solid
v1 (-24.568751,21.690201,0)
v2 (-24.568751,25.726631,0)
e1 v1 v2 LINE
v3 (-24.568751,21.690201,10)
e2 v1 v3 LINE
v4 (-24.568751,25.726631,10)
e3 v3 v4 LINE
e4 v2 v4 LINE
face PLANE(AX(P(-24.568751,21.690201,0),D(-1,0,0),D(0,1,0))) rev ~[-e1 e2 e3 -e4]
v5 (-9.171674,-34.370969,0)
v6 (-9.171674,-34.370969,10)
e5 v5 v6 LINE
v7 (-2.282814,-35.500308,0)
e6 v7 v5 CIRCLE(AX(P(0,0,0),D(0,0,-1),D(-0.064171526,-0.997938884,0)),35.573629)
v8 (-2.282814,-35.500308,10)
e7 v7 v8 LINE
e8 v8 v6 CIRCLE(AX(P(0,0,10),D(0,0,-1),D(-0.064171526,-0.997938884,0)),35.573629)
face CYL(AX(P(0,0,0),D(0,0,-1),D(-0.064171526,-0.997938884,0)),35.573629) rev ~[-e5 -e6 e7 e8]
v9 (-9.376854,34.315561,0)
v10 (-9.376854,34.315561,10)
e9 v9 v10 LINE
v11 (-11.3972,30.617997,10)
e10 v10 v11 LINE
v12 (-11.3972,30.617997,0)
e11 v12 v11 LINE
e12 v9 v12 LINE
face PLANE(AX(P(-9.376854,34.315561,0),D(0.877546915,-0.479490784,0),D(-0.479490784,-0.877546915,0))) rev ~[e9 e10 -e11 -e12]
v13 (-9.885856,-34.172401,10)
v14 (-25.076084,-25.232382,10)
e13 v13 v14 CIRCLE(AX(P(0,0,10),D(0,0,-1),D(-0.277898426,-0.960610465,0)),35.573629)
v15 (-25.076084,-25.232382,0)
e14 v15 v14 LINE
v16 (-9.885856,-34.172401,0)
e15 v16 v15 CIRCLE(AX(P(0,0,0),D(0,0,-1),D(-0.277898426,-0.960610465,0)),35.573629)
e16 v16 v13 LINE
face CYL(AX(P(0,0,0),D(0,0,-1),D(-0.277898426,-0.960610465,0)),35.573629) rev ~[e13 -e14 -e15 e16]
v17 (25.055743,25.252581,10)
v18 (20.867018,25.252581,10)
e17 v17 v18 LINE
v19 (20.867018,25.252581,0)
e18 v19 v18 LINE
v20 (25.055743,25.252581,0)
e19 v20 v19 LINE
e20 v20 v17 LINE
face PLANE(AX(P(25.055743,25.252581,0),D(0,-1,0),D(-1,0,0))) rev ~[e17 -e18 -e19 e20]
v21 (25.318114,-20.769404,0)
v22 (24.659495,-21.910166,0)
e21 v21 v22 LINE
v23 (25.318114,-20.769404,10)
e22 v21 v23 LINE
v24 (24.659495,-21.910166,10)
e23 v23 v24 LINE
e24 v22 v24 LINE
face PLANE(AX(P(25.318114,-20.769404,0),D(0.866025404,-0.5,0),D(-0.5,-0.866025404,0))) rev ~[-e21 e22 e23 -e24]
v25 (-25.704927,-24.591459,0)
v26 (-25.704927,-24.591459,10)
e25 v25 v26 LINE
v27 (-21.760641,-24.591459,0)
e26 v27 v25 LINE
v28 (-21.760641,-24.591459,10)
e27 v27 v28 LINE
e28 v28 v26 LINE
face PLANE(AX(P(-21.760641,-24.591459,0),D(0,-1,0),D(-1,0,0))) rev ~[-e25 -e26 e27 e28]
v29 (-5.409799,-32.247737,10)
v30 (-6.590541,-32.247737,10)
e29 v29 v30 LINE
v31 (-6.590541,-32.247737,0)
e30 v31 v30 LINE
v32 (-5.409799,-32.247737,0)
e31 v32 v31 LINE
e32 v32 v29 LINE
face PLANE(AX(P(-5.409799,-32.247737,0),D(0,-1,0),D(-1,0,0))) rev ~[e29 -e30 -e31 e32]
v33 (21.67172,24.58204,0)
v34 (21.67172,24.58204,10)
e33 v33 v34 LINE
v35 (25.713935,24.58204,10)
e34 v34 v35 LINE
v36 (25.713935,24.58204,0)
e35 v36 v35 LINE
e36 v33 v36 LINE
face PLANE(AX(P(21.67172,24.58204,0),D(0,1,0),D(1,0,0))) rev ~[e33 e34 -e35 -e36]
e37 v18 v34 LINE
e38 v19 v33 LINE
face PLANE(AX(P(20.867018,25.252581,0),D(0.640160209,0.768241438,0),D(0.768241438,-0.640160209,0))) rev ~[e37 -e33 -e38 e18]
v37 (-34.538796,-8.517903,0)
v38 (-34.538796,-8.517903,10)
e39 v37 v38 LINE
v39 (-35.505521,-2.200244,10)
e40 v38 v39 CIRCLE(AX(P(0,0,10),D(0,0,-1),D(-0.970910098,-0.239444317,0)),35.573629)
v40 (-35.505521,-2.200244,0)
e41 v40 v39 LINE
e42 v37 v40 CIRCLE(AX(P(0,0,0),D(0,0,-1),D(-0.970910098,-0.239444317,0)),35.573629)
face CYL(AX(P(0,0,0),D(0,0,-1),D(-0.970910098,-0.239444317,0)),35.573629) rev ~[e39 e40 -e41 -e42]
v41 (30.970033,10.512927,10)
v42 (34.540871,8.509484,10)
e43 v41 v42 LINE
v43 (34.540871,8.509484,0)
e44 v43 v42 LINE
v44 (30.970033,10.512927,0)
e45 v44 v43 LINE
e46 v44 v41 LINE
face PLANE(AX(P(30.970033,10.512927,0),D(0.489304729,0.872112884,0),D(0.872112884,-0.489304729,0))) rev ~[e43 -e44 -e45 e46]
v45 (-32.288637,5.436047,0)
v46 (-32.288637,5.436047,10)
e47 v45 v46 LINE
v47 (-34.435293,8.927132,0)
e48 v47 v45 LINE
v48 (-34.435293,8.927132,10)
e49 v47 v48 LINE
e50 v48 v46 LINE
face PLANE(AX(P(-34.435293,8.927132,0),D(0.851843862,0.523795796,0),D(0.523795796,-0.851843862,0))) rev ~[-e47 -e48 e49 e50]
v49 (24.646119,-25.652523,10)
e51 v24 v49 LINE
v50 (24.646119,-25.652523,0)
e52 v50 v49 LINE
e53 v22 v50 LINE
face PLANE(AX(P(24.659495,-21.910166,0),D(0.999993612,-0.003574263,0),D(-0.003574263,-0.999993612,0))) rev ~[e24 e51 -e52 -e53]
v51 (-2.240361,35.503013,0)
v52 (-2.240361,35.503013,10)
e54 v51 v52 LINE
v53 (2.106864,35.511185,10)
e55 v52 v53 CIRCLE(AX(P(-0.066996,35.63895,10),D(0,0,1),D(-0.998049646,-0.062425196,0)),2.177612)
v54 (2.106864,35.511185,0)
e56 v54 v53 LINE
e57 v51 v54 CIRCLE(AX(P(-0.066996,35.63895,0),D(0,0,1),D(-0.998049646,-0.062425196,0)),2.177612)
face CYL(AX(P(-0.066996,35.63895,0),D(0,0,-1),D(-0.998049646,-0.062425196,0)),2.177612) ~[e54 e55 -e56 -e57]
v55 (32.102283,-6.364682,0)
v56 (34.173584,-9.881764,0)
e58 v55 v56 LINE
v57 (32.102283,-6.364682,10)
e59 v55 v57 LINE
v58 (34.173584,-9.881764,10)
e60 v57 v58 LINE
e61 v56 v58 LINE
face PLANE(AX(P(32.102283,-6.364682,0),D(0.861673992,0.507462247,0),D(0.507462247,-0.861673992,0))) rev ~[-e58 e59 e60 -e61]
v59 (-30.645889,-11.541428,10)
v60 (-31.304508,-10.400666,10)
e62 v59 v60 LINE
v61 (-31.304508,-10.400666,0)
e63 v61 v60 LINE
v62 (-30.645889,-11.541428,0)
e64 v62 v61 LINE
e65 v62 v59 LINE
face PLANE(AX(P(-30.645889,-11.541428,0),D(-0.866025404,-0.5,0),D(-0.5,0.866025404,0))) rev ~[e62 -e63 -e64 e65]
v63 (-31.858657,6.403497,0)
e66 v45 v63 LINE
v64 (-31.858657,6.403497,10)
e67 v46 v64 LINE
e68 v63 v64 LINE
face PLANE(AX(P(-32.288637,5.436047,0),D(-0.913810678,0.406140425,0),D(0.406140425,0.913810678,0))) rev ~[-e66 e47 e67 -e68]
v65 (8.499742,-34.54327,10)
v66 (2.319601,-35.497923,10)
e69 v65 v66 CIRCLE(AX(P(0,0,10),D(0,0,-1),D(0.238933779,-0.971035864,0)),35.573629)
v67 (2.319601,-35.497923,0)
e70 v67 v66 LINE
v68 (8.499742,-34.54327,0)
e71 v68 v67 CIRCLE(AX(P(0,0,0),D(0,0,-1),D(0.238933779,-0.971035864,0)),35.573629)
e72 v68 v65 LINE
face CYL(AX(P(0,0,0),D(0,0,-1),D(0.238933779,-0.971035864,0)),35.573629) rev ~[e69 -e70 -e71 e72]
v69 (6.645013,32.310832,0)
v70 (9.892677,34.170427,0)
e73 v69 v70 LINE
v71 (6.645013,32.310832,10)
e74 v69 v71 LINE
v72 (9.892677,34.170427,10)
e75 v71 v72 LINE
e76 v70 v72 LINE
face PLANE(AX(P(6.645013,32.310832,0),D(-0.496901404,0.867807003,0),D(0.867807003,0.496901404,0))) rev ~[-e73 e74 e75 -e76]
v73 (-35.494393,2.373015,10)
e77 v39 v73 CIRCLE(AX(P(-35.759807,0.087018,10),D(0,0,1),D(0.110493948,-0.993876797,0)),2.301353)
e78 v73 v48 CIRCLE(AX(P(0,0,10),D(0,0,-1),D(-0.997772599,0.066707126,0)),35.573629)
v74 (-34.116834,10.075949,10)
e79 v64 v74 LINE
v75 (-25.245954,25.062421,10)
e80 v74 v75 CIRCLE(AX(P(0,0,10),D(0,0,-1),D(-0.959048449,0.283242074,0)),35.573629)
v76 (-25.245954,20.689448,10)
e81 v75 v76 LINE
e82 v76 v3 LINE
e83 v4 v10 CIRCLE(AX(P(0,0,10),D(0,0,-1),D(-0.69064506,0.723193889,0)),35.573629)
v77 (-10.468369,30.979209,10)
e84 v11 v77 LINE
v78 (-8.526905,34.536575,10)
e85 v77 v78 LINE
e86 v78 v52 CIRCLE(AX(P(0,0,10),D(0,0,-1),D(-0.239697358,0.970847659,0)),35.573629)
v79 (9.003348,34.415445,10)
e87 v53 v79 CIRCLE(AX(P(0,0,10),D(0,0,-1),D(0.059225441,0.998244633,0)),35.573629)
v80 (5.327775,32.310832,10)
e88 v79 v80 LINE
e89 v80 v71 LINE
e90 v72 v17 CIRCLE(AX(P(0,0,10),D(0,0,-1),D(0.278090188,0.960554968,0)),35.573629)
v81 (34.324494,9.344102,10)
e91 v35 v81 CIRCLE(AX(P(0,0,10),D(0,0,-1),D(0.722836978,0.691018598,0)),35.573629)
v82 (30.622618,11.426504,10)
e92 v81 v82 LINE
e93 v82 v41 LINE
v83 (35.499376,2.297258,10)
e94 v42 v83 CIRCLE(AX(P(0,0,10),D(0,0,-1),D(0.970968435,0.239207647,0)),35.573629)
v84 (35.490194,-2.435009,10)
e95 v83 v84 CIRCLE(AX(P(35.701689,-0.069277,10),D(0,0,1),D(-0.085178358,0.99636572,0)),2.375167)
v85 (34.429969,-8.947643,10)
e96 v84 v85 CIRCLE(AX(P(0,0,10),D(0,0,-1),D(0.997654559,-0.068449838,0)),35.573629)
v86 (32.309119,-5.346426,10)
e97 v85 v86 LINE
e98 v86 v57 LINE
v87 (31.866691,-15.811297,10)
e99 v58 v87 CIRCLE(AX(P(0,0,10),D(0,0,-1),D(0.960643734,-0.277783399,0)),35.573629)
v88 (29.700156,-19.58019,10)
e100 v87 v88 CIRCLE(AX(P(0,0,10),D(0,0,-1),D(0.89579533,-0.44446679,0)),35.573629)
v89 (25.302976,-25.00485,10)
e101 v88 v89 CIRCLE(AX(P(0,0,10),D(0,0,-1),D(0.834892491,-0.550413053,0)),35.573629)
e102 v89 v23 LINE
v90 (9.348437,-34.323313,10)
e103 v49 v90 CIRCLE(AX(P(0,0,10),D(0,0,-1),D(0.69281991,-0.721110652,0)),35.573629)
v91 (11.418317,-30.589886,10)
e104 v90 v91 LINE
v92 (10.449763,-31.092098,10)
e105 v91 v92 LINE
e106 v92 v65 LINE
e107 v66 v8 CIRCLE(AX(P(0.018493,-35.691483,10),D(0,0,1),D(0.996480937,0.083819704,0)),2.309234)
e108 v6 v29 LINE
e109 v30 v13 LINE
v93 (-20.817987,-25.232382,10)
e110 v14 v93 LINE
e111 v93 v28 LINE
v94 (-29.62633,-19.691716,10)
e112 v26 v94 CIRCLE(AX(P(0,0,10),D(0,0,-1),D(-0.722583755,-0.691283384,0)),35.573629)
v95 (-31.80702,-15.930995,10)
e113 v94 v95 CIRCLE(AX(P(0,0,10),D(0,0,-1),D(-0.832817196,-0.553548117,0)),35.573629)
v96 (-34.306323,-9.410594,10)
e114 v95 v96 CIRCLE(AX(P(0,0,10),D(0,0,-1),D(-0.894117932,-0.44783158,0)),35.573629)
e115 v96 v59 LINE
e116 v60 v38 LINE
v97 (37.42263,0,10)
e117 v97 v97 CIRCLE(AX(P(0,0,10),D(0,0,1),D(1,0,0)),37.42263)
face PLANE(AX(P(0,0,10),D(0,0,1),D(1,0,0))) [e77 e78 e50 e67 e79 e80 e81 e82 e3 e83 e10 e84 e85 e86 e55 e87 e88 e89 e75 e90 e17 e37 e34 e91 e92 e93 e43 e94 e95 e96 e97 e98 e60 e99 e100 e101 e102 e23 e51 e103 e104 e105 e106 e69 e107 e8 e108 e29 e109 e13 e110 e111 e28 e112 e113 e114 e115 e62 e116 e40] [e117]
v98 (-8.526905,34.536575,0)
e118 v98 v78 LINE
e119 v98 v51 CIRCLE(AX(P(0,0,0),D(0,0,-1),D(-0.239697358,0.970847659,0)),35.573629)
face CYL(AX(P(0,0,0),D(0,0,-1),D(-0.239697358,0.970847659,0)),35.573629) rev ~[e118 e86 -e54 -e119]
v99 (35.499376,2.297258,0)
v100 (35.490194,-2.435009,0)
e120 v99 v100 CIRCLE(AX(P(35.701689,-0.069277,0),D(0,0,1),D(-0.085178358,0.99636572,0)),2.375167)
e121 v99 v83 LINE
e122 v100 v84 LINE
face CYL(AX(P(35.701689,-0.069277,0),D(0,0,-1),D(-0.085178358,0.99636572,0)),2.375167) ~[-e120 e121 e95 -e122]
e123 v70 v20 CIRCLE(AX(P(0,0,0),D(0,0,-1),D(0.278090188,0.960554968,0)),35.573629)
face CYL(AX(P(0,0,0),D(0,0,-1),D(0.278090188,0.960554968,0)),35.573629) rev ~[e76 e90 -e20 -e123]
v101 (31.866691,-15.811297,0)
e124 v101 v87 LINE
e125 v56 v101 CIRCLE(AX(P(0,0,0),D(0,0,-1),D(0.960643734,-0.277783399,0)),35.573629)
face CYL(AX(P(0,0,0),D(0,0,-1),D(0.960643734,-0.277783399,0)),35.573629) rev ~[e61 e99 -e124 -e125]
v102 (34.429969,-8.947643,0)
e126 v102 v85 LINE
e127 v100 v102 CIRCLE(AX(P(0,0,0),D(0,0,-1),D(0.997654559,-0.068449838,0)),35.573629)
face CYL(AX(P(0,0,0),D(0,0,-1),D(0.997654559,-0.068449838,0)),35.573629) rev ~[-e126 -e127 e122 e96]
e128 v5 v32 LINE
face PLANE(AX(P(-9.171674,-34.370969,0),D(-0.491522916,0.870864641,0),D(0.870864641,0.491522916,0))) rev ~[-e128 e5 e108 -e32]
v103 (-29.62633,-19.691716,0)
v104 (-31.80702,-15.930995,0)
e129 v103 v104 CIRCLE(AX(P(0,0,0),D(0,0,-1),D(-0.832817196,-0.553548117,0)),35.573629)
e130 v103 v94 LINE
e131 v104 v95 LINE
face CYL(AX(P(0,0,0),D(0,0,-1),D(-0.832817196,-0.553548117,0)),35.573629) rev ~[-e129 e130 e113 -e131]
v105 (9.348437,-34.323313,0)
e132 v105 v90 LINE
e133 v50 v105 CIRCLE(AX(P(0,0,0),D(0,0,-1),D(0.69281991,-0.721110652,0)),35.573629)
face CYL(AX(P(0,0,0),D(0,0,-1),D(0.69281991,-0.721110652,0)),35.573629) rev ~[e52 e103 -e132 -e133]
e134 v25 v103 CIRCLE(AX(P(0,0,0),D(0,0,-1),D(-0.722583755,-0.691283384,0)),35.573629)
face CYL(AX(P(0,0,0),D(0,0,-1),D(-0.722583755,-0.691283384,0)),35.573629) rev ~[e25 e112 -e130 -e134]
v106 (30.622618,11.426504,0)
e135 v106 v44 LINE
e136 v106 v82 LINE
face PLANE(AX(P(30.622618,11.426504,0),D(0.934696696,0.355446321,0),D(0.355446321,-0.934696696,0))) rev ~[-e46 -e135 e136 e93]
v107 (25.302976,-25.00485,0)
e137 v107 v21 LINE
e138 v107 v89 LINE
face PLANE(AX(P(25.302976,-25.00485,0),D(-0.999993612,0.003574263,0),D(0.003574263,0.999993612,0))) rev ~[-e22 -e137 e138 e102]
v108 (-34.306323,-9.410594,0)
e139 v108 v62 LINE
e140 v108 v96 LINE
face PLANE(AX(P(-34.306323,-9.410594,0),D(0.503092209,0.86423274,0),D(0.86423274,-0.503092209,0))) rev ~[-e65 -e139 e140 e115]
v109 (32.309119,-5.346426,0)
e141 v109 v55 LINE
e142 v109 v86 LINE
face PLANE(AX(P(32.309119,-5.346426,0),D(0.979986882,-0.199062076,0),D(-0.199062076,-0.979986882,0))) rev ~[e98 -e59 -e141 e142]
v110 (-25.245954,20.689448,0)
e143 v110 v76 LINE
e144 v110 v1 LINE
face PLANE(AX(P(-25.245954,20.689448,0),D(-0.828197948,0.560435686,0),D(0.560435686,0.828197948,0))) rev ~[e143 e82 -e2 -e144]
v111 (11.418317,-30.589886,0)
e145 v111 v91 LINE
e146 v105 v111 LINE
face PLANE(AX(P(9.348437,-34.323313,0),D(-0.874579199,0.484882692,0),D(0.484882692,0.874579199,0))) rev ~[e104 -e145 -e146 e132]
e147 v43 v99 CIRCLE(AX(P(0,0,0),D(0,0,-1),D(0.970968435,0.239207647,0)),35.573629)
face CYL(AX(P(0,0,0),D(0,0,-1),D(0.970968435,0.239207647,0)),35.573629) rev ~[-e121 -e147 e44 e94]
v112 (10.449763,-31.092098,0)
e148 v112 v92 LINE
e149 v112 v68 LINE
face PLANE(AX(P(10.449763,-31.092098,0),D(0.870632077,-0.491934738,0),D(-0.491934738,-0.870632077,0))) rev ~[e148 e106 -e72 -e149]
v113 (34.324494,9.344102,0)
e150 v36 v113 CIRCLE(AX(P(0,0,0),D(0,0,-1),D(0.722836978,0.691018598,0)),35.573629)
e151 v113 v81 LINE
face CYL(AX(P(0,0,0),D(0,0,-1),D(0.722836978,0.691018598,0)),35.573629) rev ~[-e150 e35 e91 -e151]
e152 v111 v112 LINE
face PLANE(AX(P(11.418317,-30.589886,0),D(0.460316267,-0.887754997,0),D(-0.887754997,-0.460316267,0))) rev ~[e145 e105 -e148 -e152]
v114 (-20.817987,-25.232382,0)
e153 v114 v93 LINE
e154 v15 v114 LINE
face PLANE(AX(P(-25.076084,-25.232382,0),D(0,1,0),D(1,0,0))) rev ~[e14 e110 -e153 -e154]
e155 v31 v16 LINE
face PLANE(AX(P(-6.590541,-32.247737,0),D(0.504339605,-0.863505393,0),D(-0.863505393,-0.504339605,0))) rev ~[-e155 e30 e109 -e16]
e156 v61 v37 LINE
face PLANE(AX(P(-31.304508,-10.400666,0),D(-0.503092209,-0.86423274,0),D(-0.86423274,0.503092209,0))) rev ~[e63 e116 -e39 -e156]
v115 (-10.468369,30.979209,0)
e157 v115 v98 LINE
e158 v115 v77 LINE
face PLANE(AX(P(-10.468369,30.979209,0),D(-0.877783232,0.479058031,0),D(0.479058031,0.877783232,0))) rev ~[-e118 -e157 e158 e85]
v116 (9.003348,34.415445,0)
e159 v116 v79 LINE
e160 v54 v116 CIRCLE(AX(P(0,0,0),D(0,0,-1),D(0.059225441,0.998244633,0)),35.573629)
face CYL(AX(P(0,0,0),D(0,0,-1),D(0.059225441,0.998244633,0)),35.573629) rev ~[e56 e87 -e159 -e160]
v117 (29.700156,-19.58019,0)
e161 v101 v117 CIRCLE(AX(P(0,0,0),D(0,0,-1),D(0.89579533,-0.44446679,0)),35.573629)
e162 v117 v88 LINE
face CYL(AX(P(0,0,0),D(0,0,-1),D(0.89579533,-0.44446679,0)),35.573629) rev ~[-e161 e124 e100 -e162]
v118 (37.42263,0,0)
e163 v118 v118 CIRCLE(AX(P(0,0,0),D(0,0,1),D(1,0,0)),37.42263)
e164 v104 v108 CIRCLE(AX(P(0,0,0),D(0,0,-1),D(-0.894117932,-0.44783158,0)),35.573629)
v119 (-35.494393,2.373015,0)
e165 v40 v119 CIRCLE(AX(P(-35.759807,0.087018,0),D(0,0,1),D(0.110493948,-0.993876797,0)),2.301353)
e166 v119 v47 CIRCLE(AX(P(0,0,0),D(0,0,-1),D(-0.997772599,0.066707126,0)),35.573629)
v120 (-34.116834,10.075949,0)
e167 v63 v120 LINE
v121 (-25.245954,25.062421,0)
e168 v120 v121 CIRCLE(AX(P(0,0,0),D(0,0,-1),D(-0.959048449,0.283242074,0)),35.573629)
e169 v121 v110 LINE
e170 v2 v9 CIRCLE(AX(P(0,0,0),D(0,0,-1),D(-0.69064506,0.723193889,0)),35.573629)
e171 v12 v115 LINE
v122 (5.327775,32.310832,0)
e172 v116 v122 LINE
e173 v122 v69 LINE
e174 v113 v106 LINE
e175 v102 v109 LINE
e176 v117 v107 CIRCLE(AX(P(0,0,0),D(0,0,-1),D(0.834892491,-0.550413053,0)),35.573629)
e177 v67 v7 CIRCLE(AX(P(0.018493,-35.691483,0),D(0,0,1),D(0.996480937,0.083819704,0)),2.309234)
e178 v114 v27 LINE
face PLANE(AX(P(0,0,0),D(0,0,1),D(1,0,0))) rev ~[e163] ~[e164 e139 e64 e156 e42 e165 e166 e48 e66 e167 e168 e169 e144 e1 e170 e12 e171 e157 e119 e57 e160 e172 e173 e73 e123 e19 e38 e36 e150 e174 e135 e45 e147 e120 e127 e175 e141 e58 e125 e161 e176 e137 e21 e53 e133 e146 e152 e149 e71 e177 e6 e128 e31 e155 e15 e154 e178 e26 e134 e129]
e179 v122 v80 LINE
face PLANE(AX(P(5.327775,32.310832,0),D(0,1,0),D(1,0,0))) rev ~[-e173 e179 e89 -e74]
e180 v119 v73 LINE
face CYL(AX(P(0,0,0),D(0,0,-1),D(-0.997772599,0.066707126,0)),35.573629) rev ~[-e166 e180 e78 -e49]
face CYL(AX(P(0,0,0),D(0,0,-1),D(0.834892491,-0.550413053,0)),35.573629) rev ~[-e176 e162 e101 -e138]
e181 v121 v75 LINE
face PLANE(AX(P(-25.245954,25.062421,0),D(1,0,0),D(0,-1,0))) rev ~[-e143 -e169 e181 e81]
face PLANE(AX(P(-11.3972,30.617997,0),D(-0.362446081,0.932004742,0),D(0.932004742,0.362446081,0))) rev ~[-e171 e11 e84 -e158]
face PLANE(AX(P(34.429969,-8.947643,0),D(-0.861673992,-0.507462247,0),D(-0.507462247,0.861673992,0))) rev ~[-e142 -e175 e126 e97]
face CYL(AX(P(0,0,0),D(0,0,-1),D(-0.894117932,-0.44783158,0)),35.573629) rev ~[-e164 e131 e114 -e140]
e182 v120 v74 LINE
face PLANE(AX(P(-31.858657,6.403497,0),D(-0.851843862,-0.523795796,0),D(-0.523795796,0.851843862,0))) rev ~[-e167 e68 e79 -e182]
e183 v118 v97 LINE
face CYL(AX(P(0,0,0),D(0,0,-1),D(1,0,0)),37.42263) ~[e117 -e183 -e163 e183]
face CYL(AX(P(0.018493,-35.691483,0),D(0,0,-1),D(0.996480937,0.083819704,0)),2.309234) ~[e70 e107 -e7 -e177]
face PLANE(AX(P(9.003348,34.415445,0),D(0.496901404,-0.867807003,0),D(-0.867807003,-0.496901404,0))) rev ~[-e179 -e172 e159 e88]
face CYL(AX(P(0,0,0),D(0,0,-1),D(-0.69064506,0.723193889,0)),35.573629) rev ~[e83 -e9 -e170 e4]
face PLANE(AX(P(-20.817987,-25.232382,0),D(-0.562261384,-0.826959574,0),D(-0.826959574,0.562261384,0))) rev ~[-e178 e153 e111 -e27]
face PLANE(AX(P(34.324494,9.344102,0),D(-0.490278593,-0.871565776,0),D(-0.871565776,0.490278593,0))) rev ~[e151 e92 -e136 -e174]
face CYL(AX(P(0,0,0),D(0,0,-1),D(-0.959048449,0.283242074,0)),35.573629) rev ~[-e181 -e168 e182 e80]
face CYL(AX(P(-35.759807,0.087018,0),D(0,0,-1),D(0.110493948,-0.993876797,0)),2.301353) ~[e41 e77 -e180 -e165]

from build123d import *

# Parameters (mm, degrees)
F0_R     = 37.4226300925
F1_DEPTH = 10


with BuildPart() as f1:
    # F0 (on Top) → F1 (new body)
    with BuildSketch(Plane.XY):
        Circle(F0_R)
        with BuildLine():
            ThreePointArc((-8.5269049855, 34.5365748806), (-5.4052755249, 35.1605760706), (-2.2403607921, 35.5030125009))
            ThreePointArc((-2.2403607921, 35.5030125009), (-0.0668734001, 35.5735666059), (2.1068638934, 35.5111846839))
            ThreePointArc((2.1068638934, 35.5111846839), (5.5820572148, 35.1329439468), (9.0033478551, 34.4154447962))
            Line((9.0033478551, 34.4154447962), (5.3277746774, 32.3108322918))
            Line((5.3277746774, 32.3108322918), (6.6450131126, 32.3108322918))
            Line((6.6450131126, 32.3108322918), (9.8926773092, 34.1704265231))
            ThreePointArc((9.8926773092, 34.1704265231), (18.0341344438, 30.6635468917), (25.0557426886, 25.2525814807))
            Line((25.0557426886, 25.2525814807), (20.8670180282, 25.2525814807))
            Line((20.8670180282, 25.2525814807), (21.6717198491, 24.5820395648))
            Line((21.6717198491, 24.5820395648), (25.7139348204, 24.5820395648))
            ThreePointArc((25.7139348204, 24.5820395648), (30.970985058, 17.5008913388), (34.3244938146, 9.3441017486))
            Line((34.3244938146, 9.3441017486), (30.6226182729, 11.4265037701))
            Line((30.6226182729, 11.4265037701), (30.9700332582, 10.5129266158))
            Line((30.9700332582, 10.5129266158), (34.5408713256, 8.5094841905))
            ThreePointArc((34.5408713256, 8.5094841905), (35.1576024678, 5.4245831021), (35.4993763194, 2.2972579413))
            ThreePointArc((35.4993763194, 2.2972579413), (33.326526558, -0.0646682307), (35.4901936241, -2.4350091671))
            ThreePointArc((35.4901936241, -2.4350091671), (35.1114069781, -5.7159612611), (34.4299693949, -8.9476432978))
            Line((34.4299693949, -8.9476432978), (32.3091186583, -5.346425809))
            Line((32.3091186583, -5.346425809), (32.1022830904, -6.364681758))
            Line((32.1022830904, -6.364681758), (34.1735842261, -9.8817637222))
            ThreePointArc((34.1735842261, -9.8817637222), (33.1529686946, -12.898208397), (31.8666911327, -15.8112968908))
            ThreePointArc((31.8666911327, -15.8112968908), (30.841049084, -17.7288692397), (29.700156108, -19.5801899959))
            ThreePointArc((29.700156108, -19.5801899959), (27.6349933602, -22.4006753268), (25.3029755485, -25.0048503597))
            Line((25.3029755485, -25.0048503597), (25.3181142434, -20.7694043622))
            Line((25.3181142434, -20.7694043622), (24.6594950259, -21.9101663099))
            Line((24.6594950259, -21.9101663099), (24.6461187726, -25.6525231228))
            ThreePointArc((24.6461187726, -25.6525231228), (17.5414682427, -30.9480210192), (9.3484371144, -34.3233133108))
            Line((9.3484371144, -34.3233133108), (11.4183174446, -30.5898860097))
            Line((11.4183174446, -30.5898860097), (10.4497633874, -31.0920979828))
            Line((10.4497633874, -31.0920979828), (8.4997417198, -34.543270022))
            ThreePointArc((8.4997417198, -34.543270022), (5.4306890655, -35.1566598156), (2.3196007667, -35.4979233956))
            ThreePointArc((2.3196007667, -35.4979233956), (0.0172965119, -33.3822489231), (-2.2828140972, -35.5003080679))
            ThreePointArc((-2.2828140972, -35.5003080679), (-5.7550130369, -35.1050272477), (-9.1716738253, -34.3709690343))
            Line((-9.1716738253, -34.3709690343), (-5.4097990505, -32.2477370501))
            Line((-5.4097990505, -32.2477370501), (-6.5905414522, -32.2477370501))
            Line((-6.5905414522, -32.2477370501), (-9.885855651, -34.1724007229))
            ThreePointArc((-9.885855651, -34.1724007229), (-18.0434280361, -30.6580791607), (-25.0760843465, -25.2323821104))
            Line((-25.0760843465, -25.2323821104), (-20.8179873924, -25.2323821104))
            Line((-20.8179873924, -25.2323821104), (-21.7606406659, -24.5914589614))
            Line((-21.7606406659, -24.5914589614), (-25.7049267509, -24.5914589614))
            ThreePointArc((-25.7049267509, -24.5914589614), (-27.7738883496, -22.2282306777), (-29.6263303406, -19.6917156101))
            ThreePointArc((-29.6263303406, -19.6917156101), (-30.7741756839, -17.8446973663), (-31.8070200014, -15.930994688))
            ThreePointArc((-31.8070200014, -15.930994688), (-33.2170505751, -12.73226862), (-34.3063234036, -9.4105944365))
            Line((-34.3063234036, -9.4105944365), (-30.6458889209, -11.5414279296))
            Line((-30.6458889209, -11.5414279296), (-31.3045081384, -10.400665982))
            Line((-31.3045081384, -10.400665982), (-34.5387960818, -8.5179034004))
            ThreePointArc((-34.5387960818, -8.5179034004), (-35.1643257366, -5.3808278739), (-35.505521273, -2.20024368))
            ThreePointArc((-35.505521273, -2.20024368), (-33.4584605706, 0.0814176869), (-35.4943927242, 2.3730145927))
            ThreePointArc((-35.4943927242, 2.3730145927), (-35.1180774116, 5.6748349785), (-34.435293299, 8.9271321558))
            Line((-34.435293299, 8.9271321558), (-32.2886370122, 5.4360465147))
            Line((-32.2886370122, 5.4360465147), (-31.8586565554, 6.4034969546))
            Line((-31.8586565554, 6.4034969546), (-34.1168341585, 10.0759485966))
            ThreePointArc((-34.1168341585, 10.0759485966), (-30.6126401352, 18.1204132699), (-25.2459538538, 25.0624206159))
            Line((-25.2459538538, 25.0624206159), (-25.2459538538, 20.6894481147))
            Line((-25.2459538538, 20.6894481147), (-24.5687514544, 21.6902010143))
            Line((-24.5687514544, 21.6902010143), (-24.5687514544, 25.7266314369))
            ThreePointArc((-24.5687514544, 25.7266314369), (-17.5076688048, 30.9671543113), (-9.3768544488, 34.3155608109))
            Line((-9.3768544488, 34.3155608109), (-11.3971997052, 30.6179970503))
            Line((-11.3971997052, 30.6179970503), (-10.4683693498, 30.9792086482))
            Line((-10.4683693498, 30.9792086482), (-8.5269049855, 34.5365748806))
        make_face(mode=Mode.SUBTRACT)
        with BuildLine():
            ThreePointArc((2.1068638934, 35.5111846839), (-0.0668734001, 35.5735666059), (-2.2403607921, 35.5030125009))
            ThreePointArc((-2.2403607921, 35.5030125009), (-0.0629027102, 33.4613425852), (2.1068638934, 35.5111846839))
        make_face()
    extrude(amount=F1_DEPTH)


solid = f1.part
